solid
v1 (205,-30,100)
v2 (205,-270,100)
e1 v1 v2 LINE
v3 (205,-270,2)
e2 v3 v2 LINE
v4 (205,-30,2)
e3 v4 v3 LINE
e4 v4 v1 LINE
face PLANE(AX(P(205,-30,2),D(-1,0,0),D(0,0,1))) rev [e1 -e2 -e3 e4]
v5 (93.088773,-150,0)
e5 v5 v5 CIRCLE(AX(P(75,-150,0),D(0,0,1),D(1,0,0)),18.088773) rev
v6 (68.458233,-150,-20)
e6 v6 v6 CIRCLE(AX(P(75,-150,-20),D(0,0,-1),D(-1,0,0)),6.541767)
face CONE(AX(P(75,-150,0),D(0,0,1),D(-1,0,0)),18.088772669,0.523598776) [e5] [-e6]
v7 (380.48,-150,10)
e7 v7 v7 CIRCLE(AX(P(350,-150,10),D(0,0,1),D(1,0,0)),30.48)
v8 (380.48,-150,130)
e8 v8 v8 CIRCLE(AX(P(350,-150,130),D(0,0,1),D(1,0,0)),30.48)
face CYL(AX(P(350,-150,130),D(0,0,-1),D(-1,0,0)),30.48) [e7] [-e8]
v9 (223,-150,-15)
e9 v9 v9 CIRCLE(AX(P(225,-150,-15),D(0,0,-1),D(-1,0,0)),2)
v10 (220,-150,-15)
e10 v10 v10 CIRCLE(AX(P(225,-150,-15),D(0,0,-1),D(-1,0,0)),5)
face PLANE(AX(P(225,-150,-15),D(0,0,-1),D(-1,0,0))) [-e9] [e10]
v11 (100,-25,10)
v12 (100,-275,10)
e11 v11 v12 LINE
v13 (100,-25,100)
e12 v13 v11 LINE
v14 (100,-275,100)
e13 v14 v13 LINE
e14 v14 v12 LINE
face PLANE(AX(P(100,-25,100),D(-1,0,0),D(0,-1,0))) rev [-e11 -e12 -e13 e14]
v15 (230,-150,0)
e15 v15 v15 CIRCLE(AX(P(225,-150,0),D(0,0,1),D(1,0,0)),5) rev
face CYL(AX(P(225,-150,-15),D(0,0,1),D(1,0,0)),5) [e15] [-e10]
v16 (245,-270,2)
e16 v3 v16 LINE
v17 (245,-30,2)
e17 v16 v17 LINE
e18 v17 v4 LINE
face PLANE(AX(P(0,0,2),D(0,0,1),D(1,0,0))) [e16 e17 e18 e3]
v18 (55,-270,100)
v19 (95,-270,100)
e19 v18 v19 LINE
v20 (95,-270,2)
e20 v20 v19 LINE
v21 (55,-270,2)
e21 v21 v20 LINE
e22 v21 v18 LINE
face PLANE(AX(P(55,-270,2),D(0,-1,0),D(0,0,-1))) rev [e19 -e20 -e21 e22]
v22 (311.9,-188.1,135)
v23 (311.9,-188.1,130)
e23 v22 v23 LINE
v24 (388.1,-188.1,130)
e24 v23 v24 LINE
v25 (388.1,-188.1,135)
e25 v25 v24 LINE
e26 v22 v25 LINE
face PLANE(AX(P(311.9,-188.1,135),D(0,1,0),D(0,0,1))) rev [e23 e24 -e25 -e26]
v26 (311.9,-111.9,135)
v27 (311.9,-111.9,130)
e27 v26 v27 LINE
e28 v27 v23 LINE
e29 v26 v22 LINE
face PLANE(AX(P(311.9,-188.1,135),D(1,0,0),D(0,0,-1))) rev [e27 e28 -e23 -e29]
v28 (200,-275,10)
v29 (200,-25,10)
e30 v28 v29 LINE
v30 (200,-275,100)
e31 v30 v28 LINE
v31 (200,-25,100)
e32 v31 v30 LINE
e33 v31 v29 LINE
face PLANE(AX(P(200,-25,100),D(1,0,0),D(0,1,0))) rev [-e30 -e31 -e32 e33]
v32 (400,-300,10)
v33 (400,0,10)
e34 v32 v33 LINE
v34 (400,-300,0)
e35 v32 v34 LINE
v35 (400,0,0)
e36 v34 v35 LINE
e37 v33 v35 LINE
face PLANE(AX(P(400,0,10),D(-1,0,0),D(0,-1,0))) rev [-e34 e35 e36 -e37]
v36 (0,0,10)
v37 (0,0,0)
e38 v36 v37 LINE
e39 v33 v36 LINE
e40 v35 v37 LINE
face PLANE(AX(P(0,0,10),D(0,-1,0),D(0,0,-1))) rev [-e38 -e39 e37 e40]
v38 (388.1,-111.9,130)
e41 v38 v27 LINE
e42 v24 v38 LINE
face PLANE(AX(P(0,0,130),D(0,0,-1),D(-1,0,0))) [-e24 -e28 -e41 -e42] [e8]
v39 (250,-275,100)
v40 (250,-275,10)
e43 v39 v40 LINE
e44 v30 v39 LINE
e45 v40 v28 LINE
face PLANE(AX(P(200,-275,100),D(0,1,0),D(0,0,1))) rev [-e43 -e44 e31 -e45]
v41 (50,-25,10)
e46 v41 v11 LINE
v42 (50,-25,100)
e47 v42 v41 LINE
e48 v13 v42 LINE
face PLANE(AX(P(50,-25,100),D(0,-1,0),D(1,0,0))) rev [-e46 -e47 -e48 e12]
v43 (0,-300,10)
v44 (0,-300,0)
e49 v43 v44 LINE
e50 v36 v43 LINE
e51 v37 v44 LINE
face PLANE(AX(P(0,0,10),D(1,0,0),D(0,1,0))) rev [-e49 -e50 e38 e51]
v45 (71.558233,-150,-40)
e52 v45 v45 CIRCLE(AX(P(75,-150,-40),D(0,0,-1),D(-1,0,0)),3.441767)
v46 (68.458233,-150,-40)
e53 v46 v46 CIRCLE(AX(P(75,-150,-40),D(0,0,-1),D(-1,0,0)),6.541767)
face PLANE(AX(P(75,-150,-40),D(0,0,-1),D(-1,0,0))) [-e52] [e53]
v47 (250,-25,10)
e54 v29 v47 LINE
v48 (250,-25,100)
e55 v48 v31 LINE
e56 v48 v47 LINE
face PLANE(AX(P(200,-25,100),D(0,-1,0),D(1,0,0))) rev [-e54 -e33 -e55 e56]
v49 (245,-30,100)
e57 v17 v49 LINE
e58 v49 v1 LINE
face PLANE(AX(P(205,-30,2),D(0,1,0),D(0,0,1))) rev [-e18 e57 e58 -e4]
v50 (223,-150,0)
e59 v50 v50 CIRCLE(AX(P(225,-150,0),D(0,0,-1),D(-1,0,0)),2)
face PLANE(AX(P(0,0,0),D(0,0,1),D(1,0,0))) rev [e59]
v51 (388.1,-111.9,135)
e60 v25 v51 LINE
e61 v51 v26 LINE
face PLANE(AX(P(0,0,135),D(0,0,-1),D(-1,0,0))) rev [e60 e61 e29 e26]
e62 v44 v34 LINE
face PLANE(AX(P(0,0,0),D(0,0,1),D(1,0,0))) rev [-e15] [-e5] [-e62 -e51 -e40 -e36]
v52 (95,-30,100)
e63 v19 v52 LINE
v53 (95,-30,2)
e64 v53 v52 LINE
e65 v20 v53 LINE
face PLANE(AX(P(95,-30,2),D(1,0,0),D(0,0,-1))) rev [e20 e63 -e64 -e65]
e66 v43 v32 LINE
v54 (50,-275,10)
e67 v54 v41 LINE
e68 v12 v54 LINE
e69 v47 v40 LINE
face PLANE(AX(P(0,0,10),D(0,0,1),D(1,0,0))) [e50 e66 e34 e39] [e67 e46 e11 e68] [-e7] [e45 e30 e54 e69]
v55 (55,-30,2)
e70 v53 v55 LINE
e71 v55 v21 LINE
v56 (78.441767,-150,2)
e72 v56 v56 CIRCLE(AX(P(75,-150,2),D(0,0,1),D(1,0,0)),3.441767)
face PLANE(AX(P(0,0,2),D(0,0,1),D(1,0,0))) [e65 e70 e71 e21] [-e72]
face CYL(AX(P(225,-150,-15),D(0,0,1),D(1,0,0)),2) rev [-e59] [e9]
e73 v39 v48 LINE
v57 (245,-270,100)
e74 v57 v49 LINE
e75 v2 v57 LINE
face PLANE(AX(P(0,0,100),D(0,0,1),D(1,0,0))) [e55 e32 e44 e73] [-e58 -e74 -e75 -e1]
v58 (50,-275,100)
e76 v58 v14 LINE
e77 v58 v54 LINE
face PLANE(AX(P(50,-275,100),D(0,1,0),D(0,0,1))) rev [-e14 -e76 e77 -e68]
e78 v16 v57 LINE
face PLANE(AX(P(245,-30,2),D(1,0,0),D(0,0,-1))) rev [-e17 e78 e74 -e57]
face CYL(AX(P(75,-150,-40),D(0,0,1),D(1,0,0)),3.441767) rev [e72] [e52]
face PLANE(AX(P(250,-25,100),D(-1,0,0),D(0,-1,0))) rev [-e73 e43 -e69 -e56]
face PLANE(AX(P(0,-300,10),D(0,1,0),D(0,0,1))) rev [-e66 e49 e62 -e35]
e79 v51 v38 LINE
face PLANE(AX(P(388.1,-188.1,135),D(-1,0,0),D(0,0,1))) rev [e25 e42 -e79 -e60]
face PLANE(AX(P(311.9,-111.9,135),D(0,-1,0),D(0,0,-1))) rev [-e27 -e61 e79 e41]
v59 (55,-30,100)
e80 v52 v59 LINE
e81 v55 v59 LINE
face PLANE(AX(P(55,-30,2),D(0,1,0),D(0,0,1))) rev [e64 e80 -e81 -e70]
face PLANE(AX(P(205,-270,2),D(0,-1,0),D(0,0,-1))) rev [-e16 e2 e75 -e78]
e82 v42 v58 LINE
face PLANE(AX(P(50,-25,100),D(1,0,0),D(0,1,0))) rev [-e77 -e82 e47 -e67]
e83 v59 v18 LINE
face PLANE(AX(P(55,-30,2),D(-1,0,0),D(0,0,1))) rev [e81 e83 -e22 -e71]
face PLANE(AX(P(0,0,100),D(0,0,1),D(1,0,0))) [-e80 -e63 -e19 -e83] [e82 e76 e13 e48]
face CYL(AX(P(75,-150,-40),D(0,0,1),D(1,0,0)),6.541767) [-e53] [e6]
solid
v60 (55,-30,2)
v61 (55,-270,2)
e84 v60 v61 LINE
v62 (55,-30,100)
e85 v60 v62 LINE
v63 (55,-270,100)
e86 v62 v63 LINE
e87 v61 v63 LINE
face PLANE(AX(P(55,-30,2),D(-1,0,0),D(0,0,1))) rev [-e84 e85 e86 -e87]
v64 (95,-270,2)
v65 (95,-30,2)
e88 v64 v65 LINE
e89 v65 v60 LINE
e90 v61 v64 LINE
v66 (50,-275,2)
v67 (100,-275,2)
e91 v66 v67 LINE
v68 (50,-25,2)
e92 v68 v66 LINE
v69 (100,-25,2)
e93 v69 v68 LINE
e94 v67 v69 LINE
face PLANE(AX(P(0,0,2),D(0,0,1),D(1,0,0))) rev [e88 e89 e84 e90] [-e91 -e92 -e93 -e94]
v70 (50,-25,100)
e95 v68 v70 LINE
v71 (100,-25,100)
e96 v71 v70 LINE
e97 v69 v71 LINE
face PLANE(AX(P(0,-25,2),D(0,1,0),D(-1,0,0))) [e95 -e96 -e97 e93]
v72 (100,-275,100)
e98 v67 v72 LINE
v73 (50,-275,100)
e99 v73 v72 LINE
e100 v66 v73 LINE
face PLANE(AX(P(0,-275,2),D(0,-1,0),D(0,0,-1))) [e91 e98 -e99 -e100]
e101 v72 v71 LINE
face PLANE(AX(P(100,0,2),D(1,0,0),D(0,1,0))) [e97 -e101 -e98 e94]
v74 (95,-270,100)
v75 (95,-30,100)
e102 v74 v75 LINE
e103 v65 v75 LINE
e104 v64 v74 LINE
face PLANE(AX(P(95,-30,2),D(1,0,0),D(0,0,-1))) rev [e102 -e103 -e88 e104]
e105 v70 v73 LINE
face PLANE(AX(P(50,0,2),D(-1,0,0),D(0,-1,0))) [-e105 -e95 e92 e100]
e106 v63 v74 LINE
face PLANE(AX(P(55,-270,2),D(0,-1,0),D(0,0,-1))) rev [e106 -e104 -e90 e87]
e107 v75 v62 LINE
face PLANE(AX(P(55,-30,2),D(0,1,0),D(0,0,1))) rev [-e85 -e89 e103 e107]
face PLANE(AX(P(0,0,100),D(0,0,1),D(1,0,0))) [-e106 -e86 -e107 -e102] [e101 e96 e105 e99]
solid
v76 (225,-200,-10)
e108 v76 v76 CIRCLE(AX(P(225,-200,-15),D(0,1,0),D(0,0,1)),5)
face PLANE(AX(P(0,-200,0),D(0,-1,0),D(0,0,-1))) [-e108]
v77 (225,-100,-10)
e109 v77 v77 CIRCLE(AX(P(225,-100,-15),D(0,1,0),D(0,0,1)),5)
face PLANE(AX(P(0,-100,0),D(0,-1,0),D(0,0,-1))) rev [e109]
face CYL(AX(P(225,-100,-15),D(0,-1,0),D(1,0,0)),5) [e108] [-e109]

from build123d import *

# Parameters (mm, degrees)
SKETCH2_W                = 400
SKETCH2_H                = 300
BOSS_EXTRUDE1_DEPTH      = 10
SKETCH3_W                = 50
SKETCH3_H                = 250
BOSS_EXTRUDE2_DEPTH      = 100
SKETCH7_W                = 50
SKETCH7_H                = 250
BOSS_EXTRUDE3_DEPTH      = 98
SKETCH9_W                = 40
SKETCH9_H                = 240
CUT_EXTRUDE2_DEPTH       = 98
SKETCH11_W               = 40
SKETCH11_H               = 240
CUT_EXTRUDE3_DEPTH       = 98
SKETCH12_R               = 30.48
BOSS_EXTRUDE4_DEPTH      = 120
SKETCH13_W               = 76.2
SKETCH13_H               = 76.2
BOSS_EXTRUDE5_DEPTH      = 5
SKETCH14_R               = 18.088772669
BOSS_EXTRUDE6_DEPTH      = 20
BOSS_EXTRUDE6_TAPER      = 30
SKETCH20_R               = 6.541767286
SKETCH20_R_2             = 3.441767286
EXTRUDE_THIN2_DEPTH      = 20
CUT_EXTRUDE6_START       = -30
SKETCH22_R               = 3.441767286
CUT_EXTRUDE6_DEPTH       = 30
SKETCH23_R               = 5
SKETCH23_R_2             = 2
EXTRUDE_THIN3_DEPTH      = 15
BOSS_EXTRUDE11_START     = -200
BOSS_EXTRUDE11_OUTLINE_R = 5
BOSS_EXTRUDE11_DEPTH     = 100


# Read off the part's stored shape, not the designer's step: Boss-Extrude11
with BuildPart() as part:
    # Sketch2 → Boss-Extrude1 (new body)
    with BuildSketch(Plane.XY):
        with Locations((200, -150)):
            Rectangle(SKETCH2_W, SKETCH2_H)
    extrude(amount=BOSS_EXTRUDE1_DEPTH)

    # Sketch3 → Boss-Extrude2 (add)
    with BuildSketch(Plane.XY):
        with Locations((75, -150)):
            Rectangle(SKETCH3_W, SKETCH3_H)
        with Locations((225, -150)):
            Rectangle(SKETCH3_W, SKETCH3_H)
    extrude(amount=BOSS_EXTRUDE2_DEPTH)


with BuildPart() as body_2:
    # Sketch7 → Boss-Extrude3 (new body)
    with BuildSketch(Plane.XY.offset(100)):
        with Locations((75, -150)):
            Rectangle(SKETCH7_W, SKETCH7_H)
    extrude(amount=-BOSS_EXTRUDE3_DEPTH)


with BuildPart() as cut_extrude2_tool:
    # Sketch9 → Cut-Extrude2 (new body)
    with BuildSketch(Plane.XY.offset(100)):
        with Locations((75, -150)):
            Rectangle(SKETCH9_W, SKETCH9_H)
    extrude(amount=-CUT_EXTRUDE2_DEPTH)


with BuildPart() as part_1:
    add(part.part)

    # Cut-Extrude2: cut by cut_extrude2_tool
    add(cut_extrude2_tool.part, mode=Mode.SUBTRACT)

    # Sketch11 → Cut-Extrude3 (cut)
    with BuildSketch(Plane.XY.offset(100)):
        with Locations((225, -150)):
            Rectangle(SKETCH11_W, SKETCH11_H)
    extrude(amount=-CUT_EXTRUDE3_DEPTH, mode=Mode.SUBTRACT)

    # Sketch12 → Boss-Extrude4 (add)
    with BuildSketch(Plane.XY.offset(10)):
        with Locations((350, -150)):
            Circle(SKETCH12_R)
    extrude(amount=BOSS_EXTRUDE4_DEPTH)

    # Sketch13 → Boss-Extrude5 (add)
    with BuildSketch(Plane.XY.offset(130)):
        with Locations((350, -150)):
            Rectangle(SKETCH13_W, SKETCH13_H)
    extrude(amount=BOSS_EXTRUDE5_DEPTH)

    # Sketch14 → Boss-Extrude6 (add)
    with BuildSketch(Plane(origin=(0, 0, 0), x_dir=(-1, 0, 0), z_dir=(0, 0, -1))):
        with Locations((-75, -150)):
            Circle(SKETCH14_R)
    extrude(amount=BOSS_EXTRUDE6_DEPTH, taper=BOSS_EXTRUDE6_TAPER)

    # Sketch20 → Extrude-Thin2 (add)
    with BuildSketch(Plane(origin=(0, 0, -20), x_dir=(-1, 0, 0), z_dir=(0, 0, -1))):
        with Locations((-75, -150)):
            Circle(SKETCH20_R)
        with Locations((-75, -150)):
            Circle(SKETCH20_R_2, mode=Mode.SUBTRACT)
    extrude(amount=EXTRUDE_THIN2_DEPTH)

    # Sketch22 → Cut-Extrude6 (cut)
    with BuildSketch(Plane(origin=(0, 0, -20), x_dir=(-1, 0, 0), z_dir=(0, 0, -1)).offset(CUT_EXTRUDE6_START)):
        with Locations(Location((-75, -150, 0), (0, 0, 180))):
            Circle(SKETCH22_R)
    extrude(amount=CUT_EXTRUDE6_DEPTH, mode=Mode.SUBTRACT)

    # Sketch23 → Extrude-Thin3 (add)
    with BuildSketch(Plane(origin=(0, 0, 0), x_dir=(-1, 0, 0), z_dir=(0, 0, -1))):
        with Locations((-225, -150)):
            Circle(SKETCH23_R)
        with Locations((-225, -150)):
            Circle(SKETCH23_R_2, mode=Mode.SUBTRACT)
    extrude(amount=EXTRUDE_THIN3_DEPTH)


with BuildPart() as body_2_1:
    add(body_2.part)

    # Cut-Extrude2: cut by cut_extrude2_tool
    add(cut_extrude2_tool.part, mode=Mode.SUBTRACT)


with BuildPart() as body_3:
    # Boss-Extrude11 outline → Boss-Extrude11 (new body)
    with BuildSketch(Plane(origin=(0, 0, 0), x_dir=(1, 0, 0), z_dir=(0, 1, 0)).offset(BOSS_EXTRUDE11_START)):
        with Locations((225, 15)):
            Circle(BOSS_EXTRUDE11_OUTLINE_R)
    extrude(amount=BOSS_EXTRUDE11_DEPTH)


solid = Compound([part_1.part, body_2_1.part, body_3.part])
